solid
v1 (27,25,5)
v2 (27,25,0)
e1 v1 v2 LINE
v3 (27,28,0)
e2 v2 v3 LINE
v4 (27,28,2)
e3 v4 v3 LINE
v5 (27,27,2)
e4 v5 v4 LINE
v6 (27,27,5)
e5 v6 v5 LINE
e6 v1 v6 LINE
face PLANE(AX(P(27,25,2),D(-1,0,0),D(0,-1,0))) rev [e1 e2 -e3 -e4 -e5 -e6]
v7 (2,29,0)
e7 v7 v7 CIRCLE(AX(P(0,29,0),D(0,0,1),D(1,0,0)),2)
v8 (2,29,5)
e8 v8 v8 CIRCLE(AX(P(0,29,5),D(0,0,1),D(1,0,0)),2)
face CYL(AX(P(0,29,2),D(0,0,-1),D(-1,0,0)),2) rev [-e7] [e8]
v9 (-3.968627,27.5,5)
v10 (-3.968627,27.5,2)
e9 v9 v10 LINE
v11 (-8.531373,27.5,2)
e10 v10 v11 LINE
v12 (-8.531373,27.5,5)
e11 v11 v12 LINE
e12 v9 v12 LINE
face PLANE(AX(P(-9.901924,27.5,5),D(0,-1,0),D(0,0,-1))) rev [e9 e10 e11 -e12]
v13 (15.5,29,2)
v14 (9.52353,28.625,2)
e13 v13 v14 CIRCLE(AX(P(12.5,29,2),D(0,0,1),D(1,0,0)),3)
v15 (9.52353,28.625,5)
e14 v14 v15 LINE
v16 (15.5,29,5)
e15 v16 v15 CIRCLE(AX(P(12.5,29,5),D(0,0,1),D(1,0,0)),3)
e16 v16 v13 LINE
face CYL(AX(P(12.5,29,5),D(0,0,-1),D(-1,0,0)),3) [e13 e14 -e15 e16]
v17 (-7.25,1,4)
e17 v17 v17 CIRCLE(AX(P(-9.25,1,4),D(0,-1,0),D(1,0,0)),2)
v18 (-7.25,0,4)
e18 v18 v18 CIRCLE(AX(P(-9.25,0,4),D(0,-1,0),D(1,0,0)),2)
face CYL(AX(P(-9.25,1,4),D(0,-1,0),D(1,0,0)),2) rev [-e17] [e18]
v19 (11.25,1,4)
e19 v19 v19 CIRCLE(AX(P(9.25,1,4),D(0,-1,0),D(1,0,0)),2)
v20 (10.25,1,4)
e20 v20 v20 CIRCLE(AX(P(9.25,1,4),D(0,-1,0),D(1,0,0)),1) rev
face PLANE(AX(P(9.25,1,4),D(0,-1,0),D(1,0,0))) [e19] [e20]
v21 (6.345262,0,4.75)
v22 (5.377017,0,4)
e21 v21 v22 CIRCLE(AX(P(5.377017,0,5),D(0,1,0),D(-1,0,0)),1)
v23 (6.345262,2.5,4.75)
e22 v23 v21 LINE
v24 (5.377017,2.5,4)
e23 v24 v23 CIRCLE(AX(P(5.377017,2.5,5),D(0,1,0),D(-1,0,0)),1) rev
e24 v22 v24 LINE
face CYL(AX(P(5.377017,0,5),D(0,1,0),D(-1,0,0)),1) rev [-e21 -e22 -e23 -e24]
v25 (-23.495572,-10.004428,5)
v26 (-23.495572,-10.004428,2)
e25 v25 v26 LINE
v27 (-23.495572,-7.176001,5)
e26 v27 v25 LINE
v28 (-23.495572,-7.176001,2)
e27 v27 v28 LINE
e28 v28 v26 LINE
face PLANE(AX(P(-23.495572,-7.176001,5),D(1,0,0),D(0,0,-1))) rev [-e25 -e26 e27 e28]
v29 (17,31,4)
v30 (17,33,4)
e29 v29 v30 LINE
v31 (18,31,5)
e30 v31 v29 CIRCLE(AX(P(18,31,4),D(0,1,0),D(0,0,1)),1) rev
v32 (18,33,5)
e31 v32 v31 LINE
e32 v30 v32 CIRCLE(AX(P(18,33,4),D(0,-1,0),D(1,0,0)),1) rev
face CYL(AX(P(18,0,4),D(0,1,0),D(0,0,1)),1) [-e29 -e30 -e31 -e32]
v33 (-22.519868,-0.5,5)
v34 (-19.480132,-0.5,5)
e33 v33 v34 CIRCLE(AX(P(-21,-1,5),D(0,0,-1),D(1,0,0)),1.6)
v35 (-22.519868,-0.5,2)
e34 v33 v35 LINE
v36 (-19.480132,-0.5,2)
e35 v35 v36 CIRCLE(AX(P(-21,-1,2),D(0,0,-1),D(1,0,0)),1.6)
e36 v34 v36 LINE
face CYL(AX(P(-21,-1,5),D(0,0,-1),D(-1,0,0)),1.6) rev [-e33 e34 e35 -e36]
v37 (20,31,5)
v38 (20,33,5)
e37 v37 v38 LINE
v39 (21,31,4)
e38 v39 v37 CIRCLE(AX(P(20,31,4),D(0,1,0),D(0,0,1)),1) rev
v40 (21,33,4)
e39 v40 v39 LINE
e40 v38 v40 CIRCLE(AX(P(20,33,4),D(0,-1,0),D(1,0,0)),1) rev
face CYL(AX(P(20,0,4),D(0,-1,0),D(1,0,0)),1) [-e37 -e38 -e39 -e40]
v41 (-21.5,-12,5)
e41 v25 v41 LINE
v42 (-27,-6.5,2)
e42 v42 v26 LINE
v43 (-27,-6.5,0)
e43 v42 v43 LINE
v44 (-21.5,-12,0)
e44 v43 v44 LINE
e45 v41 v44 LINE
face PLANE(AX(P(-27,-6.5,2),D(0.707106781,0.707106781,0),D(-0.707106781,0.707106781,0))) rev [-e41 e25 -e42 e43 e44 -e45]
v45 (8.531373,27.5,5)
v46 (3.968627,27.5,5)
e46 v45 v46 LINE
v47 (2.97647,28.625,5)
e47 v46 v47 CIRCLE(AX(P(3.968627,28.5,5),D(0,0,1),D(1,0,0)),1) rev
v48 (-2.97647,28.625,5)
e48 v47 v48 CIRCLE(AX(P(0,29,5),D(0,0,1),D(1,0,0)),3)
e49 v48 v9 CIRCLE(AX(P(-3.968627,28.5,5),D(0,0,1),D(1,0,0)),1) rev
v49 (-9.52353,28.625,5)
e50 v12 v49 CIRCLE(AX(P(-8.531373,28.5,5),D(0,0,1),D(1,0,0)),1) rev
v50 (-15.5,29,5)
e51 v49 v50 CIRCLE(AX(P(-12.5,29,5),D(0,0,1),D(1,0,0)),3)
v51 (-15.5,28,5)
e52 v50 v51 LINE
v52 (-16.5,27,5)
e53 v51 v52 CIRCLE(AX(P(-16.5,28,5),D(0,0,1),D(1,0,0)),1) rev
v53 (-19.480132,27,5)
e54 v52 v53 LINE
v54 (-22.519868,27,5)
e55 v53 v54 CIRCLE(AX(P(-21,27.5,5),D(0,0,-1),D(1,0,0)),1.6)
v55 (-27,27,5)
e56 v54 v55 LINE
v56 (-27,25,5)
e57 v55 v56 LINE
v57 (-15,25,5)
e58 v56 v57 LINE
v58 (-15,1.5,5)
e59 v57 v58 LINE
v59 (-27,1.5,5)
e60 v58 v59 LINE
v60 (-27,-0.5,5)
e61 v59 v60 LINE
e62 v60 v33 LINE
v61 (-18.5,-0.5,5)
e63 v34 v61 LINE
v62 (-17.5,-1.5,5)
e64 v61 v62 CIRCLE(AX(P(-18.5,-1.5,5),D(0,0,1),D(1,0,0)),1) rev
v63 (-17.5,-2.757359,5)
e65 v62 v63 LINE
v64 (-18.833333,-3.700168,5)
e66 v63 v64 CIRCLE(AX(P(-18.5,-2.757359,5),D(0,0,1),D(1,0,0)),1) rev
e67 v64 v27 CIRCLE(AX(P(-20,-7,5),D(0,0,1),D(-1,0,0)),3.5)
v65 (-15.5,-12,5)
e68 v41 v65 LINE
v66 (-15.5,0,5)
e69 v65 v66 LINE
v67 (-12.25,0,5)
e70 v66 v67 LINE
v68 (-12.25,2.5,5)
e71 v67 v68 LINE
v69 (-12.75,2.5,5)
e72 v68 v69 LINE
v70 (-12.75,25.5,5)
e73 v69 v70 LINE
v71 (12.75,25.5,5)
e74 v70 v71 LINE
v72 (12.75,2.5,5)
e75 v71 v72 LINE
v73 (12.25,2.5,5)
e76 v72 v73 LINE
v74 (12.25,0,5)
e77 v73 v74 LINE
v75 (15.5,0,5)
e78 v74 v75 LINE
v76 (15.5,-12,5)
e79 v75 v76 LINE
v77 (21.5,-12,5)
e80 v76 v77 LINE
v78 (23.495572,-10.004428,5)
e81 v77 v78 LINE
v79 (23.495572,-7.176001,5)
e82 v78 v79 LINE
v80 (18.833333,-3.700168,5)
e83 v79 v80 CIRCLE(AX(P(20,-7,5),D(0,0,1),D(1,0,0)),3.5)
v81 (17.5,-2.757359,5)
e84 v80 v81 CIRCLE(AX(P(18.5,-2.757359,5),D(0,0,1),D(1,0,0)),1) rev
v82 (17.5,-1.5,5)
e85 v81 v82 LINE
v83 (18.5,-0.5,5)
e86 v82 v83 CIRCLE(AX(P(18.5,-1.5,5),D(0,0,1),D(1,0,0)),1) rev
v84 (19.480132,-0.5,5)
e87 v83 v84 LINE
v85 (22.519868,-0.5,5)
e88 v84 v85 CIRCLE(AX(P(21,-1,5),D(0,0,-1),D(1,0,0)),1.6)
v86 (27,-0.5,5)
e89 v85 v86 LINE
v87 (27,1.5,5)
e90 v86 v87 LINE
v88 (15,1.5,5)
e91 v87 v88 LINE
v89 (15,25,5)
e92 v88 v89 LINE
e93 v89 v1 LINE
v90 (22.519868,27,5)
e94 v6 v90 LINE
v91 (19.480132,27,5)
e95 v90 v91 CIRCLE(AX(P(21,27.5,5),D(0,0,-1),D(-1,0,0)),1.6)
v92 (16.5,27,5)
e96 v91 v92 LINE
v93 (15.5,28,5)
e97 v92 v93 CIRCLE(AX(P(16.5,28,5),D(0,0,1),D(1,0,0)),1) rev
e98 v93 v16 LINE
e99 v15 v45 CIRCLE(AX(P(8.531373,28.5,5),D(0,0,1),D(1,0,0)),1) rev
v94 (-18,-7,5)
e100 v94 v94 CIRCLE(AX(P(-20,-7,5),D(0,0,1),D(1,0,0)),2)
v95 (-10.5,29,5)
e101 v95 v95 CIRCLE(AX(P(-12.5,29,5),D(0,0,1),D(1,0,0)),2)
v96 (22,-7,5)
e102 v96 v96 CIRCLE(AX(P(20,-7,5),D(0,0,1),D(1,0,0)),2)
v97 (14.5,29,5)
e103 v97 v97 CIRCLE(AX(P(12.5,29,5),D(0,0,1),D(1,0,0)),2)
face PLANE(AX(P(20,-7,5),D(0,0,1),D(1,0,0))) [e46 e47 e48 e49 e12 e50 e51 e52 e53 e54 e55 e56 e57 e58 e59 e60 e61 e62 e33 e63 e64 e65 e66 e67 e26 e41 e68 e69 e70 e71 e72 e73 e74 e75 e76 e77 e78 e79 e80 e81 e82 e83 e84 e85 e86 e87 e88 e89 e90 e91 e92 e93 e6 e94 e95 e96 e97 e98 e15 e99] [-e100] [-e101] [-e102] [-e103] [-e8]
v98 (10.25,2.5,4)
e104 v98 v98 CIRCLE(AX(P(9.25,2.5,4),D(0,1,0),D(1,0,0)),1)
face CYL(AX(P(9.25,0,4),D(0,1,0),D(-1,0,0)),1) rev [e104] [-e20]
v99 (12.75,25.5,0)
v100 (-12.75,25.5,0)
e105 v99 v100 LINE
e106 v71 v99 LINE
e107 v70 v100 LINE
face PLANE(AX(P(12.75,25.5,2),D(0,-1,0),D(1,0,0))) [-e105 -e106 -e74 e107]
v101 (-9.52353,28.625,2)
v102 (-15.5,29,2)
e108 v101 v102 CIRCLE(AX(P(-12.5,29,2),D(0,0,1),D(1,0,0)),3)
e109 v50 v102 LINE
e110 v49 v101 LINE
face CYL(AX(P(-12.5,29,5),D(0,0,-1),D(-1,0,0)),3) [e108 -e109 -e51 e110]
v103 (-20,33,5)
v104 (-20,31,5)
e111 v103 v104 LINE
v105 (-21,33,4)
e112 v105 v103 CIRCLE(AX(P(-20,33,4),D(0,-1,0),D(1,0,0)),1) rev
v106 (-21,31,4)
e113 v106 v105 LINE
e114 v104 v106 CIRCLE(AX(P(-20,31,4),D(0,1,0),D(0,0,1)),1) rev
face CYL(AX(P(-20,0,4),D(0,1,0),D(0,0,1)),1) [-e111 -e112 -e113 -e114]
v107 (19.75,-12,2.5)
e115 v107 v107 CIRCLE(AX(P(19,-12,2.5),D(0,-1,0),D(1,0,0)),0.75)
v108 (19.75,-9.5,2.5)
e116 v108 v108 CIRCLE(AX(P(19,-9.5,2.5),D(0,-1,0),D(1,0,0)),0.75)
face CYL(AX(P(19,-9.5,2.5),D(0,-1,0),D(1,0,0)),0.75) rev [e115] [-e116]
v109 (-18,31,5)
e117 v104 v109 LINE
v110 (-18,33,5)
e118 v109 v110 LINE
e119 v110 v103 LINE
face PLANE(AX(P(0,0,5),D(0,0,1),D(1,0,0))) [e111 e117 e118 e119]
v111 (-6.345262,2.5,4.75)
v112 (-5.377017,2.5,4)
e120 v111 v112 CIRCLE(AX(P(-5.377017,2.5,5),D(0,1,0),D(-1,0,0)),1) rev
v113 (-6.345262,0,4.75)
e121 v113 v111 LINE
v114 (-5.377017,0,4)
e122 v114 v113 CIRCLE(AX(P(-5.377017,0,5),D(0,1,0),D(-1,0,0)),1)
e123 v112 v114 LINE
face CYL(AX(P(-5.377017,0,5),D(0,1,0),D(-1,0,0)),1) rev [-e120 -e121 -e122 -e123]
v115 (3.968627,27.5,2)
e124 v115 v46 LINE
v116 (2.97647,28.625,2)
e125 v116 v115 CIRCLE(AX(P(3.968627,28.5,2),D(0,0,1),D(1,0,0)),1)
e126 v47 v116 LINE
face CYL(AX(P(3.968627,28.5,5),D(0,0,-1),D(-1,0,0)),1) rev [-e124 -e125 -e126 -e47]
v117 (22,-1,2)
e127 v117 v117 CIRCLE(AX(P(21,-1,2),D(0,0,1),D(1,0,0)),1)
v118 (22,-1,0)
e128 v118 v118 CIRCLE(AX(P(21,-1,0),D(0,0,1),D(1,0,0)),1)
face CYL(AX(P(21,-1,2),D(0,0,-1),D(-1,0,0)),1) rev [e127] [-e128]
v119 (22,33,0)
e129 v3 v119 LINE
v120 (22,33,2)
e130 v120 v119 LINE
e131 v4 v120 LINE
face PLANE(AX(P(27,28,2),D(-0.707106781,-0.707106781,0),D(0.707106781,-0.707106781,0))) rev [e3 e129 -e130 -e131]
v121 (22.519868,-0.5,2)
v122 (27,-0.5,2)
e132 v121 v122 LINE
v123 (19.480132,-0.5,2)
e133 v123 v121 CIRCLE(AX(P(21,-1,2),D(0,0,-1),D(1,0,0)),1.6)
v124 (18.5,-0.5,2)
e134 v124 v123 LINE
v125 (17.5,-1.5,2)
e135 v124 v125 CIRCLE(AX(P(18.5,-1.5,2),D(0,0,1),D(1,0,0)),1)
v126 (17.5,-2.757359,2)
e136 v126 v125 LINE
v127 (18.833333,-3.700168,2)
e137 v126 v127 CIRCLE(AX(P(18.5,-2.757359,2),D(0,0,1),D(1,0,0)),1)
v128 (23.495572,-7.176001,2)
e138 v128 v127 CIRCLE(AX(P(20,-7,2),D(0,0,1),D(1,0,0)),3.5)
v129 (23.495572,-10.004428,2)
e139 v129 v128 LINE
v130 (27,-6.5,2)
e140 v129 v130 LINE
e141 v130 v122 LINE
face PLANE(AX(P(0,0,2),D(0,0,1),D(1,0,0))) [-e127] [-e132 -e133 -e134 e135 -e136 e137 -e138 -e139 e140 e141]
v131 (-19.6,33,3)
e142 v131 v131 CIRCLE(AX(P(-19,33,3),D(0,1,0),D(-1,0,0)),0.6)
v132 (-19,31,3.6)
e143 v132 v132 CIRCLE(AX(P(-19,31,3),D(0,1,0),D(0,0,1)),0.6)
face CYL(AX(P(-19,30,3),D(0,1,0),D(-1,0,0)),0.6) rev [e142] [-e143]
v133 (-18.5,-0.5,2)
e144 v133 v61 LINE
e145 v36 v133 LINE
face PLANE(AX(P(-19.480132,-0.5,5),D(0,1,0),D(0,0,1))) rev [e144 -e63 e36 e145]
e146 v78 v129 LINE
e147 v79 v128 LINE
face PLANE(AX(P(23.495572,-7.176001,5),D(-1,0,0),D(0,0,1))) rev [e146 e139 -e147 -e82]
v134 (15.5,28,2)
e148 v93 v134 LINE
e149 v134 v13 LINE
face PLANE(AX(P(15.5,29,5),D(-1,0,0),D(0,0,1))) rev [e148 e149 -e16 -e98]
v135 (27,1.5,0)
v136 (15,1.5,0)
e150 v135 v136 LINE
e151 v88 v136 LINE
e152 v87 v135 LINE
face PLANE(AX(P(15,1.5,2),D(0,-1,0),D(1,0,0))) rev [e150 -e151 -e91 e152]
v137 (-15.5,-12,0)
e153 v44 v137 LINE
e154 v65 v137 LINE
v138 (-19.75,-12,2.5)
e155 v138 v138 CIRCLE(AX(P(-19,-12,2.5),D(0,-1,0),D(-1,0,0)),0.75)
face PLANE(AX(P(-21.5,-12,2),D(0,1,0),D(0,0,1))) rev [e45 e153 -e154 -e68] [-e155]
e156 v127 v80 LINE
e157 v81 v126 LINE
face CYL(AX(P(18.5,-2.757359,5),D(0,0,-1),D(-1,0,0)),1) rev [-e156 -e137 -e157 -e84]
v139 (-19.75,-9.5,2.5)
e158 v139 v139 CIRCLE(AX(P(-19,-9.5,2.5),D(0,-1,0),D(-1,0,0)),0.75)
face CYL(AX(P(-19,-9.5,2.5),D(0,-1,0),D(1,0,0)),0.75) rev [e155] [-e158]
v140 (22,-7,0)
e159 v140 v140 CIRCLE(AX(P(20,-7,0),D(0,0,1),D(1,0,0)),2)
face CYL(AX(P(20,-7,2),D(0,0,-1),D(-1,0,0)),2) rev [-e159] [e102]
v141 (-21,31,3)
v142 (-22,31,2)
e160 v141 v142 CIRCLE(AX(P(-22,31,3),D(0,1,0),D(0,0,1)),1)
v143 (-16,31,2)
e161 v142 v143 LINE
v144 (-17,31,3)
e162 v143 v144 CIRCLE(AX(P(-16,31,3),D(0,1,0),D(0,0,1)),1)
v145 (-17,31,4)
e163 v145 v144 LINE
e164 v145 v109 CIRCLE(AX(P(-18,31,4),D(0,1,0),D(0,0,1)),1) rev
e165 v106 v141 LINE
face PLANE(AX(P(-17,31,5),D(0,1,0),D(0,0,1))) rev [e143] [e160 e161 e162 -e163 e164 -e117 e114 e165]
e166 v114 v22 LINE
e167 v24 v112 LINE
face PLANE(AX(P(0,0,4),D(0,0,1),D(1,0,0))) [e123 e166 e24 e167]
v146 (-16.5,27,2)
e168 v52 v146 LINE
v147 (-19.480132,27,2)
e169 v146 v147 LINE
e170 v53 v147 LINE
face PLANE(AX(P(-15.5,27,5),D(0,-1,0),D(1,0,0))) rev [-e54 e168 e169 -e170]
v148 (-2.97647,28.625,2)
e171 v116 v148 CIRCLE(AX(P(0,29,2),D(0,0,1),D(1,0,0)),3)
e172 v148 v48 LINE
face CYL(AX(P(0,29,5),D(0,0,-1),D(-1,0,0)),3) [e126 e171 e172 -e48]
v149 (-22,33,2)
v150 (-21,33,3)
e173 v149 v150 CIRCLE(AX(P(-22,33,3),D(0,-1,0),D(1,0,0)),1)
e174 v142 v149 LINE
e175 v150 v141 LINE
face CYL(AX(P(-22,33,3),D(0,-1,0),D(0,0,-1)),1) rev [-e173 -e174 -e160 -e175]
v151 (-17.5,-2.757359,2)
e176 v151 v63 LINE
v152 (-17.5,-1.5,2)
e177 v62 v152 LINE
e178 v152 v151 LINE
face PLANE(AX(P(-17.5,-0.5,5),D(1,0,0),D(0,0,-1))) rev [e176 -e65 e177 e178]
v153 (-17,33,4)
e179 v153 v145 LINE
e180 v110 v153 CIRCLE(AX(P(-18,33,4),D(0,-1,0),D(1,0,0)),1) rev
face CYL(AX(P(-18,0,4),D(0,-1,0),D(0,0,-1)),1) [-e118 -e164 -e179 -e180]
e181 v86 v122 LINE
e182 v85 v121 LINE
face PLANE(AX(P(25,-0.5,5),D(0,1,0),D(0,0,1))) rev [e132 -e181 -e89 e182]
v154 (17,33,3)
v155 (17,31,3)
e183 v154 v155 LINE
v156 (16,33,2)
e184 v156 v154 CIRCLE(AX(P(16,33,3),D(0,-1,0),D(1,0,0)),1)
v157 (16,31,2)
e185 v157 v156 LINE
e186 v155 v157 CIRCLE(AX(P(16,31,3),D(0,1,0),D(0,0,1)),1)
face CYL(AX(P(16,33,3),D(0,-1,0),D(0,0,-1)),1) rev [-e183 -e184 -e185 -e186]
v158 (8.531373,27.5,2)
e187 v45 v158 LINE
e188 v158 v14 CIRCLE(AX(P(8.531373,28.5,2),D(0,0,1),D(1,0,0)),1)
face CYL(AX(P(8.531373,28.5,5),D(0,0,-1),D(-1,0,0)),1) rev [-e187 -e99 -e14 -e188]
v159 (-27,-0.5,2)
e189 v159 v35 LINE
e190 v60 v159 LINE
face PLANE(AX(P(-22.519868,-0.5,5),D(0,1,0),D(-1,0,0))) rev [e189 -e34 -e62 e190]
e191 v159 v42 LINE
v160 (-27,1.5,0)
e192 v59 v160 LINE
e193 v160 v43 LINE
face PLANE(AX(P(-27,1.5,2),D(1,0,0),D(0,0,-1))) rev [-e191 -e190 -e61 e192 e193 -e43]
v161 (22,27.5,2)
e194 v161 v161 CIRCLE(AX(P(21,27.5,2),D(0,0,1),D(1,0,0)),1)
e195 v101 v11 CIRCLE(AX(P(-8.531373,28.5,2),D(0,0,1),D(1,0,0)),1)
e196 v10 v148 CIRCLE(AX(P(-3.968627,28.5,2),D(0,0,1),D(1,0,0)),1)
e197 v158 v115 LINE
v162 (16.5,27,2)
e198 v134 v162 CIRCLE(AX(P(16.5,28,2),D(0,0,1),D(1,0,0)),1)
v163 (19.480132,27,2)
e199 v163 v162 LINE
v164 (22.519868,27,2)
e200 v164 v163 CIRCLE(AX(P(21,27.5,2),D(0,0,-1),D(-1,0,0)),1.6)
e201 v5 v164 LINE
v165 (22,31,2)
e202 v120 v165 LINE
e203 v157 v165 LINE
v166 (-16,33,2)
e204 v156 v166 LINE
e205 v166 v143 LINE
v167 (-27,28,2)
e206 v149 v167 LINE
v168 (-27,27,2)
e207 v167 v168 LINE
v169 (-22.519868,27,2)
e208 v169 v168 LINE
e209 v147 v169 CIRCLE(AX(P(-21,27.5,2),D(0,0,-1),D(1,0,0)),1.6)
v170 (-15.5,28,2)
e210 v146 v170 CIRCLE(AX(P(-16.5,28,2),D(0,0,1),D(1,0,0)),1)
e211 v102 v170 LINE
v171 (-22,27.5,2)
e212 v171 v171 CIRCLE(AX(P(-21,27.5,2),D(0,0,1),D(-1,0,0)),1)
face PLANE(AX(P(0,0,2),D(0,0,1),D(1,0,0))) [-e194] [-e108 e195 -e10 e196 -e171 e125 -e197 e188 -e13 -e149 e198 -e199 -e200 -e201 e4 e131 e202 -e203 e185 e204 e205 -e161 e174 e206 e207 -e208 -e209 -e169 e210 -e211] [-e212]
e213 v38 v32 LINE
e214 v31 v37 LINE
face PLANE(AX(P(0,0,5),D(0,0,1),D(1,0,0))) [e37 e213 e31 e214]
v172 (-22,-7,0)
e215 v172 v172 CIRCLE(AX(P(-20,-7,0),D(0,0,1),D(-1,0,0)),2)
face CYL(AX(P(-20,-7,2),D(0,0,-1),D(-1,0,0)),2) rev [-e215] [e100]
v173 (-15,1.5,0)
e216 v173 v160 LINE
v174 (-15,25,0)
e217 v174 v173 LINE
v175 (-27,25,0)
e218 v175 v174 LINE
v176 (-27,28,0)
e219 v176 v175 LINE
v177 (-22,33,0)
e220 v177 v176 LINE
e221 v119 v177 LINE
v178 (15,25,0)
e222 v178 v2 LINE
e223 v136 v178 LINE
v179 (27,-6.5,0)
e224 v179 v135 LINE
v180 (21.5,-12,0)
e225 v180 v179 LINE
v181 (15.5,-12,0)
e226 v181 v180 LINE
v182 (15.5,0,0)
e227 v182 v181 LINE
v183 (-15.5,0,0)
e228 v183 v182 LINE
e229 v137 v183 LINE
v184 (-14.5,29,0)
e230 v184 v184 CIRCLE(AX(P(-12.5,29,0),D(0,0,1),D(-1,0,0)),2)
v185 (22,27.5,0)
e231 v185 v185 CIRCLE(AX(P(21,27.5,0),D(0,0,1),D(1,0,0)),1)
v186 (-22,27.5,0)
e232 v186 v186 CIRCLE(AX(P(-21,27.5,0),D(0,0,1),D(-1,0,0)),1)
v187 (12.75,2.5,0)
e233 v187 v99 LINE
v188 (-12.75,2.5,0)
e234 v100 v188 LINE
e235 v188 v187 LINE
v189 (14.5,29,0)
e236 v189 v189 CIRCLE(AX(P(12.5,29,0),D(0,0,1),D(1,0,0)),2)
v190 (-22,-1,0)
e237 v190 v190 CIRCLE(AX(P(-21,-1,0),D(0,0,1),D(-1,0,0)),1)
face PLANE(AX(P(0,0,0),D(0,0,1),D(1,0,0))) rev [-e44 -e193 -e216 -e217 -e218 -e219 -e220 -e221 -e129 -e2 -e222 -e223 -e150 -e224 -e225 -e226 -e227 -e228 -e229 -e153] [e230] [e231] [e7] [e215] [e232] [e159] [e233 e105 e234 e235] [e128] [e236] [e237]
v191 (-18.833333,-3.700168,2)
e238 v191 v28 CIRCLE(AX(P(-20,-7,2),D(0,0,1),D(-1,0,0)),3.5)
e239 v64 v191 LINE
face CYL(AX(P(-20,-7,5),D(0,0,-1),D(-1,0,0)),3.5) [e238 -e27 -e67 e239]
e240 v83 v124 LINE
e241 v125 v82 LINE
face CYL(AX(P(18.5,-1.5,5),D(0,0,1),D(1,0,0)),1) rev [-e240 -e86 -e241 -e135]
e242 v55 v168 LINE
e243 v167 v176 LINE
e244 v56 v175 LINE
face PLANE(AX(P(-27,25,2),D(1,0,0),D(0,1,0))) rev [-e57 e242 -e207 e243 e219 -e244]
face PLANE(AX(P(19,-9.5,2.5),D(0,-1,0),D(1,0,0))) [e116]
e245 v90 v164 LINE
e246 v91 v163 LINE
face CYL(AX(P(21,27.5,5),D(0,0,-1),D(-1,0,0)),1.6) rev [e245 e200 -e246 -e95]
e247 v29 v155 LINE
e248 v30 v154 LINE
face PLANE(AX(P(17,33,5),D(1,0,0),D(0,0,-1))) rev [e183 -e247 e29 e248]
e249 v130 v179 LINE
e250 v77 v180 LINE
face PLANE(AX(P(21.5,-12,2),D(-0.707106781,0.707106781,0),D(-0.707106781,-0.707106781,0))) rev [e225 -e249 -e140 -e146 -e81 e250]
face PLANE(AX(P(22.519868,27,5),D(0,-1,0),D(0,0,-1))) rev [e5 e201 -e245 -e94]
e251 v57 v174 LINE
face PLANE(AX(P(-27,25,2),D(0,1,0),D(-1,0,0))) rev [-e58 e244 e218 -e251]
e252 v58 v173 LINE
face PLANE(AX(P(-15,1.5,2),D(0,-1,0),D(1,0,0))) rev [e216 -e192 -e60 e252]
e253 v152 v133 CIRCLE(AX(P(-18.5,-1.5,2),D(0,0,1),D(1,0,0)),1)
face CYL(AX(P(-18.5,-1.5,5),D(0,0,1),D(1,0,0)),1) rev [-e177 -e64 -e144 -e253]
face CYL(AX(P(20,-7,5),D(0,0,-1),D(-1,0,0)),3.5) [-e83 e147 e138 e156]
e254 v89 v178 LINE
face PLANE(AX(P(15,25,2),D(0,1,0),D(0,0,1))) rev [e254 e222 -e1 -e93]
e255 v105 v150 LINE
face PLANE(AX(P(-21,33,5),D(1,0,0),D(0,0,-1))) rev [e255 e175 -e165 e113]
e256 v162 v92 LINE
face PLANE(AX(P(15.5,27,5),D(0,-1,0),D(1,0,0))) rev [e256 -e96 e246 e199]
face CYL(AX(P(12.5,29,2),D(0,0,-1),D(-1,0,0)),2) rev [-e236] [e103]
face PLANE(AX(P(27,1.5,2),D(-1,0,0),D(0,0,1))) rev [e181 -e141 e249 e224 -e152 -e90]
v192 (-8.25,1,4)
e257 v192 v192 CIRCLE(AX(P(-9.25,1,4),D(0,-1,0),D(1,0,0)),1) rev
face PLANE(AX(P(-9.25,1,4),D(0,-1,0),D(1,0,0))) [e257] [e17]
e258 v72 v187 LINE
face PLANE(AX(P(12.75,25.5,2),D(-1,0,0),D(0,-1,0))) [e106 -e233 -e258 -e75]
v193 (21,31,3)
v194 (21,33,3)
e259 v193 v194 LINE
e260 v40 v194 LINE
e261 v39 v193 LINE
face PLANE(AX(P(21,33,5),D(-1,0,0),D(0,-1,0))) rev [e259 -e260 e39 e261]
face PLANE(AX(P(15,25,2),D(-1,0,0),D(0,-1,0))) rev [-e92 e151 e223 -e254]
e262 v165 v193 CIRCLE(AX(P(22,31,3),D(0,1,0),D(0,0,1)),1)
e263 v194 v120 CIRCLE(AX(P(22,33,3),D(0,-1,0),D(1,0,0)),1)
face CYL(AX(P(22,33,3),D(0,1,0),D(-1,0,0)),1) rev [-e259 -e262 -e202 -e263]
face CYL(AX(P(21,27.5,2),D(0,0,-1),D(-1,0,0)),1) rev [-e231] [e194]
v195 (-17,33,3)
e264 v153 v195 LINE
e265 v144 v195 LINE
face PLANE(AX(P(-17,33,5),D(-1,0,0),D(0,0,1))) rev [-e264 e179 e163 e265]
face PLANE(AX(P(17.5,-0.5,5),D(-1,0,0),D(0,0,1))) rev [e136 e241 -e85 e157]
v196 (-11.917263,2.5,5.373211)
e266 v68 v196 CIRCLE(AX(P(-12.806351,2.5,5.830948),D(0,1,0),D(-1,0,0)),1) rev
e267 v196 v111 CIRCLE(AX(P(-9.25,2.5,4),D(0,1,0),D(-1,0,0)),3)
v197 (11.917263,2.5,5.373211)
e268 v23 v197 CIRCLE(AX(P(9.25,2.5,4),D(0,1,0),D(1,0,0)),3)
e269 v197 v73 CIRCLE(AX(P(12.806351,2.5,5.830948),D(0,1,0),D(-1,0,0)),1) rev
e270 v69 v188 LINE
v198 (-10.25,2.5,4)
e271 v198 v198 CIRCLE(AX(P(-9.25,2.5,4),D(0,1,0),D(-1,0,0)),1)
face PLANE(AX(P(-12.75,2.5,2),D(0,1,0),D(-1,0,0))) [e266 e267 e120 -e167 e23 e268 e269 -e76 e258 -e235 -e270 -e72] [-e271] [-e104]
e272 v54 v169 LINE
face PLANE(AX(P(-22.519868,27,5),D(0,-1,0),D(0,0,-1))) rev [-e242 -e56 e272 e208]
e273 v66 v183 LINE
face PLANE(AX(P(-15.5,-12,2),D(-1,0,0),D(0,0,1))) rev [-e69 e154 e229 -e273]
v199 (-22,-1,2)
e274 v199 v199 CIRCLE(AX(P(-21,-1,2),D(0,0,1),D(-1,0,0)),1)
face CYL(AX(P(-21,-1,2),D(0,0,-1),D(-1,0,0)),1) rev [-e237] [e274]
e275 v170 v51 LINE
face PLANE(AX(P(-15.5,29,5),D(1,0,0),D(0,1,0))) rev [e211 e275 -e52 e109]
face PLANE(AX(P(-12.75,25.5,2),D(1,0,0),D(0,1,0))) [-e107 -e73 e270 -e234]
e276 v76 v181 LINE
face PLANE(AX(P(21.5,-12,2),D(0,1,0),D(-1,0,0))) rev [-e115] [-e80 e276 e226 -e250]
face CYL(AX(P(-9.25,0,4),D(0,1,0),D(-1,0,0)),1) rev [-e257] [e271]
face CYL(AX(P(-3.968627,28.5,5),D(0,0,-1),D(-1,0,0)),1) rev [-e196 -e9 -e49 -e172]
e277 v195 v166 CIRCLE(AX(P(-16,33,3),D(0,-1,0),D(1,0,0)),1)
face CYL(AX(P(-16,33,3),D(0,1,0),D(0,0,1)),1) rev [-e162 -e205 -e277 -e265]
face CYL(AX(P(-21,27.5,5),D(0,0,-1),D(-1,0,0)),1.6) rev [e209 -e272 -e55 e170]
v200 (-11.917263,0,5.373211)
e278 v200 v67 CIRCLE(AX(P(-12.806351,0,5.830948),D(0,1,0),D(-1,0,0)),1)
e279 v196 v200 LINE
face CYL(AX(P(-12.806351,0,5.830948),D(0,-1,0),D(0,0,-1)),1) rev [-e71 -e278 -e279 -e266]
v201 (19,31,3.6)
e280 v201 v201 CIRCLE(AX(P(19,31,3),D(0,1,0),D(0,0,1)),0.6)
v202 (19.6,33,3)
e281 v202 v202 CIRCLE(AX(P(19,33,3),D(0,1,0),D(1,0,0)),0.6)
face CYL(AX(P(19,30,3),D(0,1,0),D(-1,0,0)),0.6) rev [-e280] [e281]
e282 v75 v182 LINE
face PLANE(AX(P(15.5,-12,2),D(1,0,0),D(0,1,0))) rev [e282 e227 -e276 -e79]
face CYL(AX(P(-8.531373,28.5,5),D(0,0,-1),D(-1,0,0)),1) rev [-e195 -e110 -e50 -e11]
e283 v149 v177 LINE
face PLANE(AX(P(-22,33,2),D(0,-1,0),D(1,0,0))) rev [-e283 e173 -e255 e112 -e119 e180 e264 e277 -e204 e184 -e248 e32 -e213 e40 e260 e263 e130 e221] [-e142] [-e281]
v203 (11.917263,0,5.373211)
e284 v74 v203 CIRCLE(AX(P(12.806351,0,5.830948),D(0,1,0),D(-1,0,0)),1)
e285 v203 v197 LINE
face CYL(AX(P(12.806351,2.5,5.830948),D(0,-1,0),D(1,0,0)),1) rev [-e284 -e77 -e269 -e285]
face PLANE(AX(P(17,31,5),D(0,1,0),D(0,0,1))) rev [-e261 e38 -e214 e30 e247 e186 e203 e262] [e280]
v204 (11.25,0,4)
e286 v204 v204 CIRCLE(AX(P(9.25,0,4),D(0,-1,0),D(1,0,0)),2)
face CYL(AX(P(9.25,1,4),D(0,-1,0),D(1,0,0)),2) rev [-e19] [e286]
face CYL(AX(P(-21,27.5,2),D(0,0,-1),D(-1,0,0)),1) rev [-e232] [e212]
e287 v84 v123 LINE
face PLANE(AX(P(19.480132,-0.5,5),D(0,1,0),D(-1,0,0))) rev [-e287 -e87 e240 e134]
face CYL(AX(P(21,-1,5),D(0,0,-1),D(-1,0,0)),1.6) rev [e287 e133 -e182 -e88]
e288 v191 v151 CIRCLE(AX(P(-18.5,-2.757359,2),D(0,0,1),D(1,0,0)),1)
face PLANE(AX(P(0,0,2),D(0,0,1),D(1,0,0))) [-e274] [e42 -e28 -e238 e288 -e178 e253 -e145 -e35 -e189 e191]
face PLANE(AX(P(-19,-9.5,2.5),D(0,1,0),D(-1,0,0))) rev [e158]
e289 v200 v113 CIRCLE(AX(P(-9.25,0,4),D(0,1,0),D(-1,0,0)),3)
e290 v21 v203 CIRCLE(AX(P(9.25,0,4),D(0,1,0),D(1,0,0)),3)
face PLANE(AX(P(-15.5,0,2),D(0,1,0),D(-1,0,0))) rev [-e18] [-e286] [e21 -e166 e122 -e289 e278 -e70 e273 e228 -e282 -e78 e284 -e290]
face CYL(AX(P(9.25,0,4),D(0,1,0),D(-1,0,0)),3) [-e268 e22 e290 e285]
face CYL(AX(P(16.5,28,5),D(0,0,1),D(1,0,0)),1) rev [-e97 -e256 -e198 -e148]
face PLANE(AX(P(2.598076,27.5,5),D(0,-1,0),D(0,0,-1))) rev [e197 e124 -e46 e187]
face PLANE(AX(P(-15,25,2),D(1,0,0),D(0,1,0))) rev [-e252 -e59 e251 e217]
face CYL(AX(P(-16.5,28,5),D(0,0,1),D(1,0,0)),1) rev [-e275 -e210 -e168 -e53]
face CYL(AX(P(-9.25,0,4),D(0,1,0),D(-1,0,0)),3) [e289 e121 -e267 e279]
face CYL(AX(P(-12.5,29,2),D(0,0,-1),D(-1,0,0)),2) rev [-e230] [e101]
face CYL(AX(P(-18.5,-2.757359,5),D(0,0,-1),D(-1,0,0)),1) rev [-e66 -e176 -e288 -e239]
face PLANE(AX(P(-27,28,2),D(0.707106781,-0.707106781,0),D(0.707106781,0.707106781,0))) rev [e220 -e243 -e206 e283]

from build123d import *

# Parameters (mm, degrees)
SKETCH_1_R          = 2
SKETCH_1_R_2        = 1
SKETCH_1_W          = 25.5
SKETCH_1_H          = 23
EXTRUDE_1_DEPTH     = 2
SKETCH_3_R          = 1
EXTRUDE_2_DEPTH     = 2.5
SKETCH_4_R          = 2
SKETCH_4_W          = 4
SKETCH_4_H          = 2
EXTRUDE_3_DEPTH     = 3
FILLET_1_R          = 1
FILLET_2_R          = 1
SKETCH_5_W          = 12.5
SKETCH_5_H          = 2.5
EXTRUDE_4_DEPTH     = 2
FILLET_3_R          = 1
SKETCH_6_R          = 2
CUT_EXTRUDE_1_DEPTH = 1
SKETCH_7_R          = 0.75
CUT_EXTRUDE_2_DEPTH = 2.5
SKETCH_8_R          = 0.6
CUT_EXTRUDE_3_DEPTH = 3


with BuildPart() as part:
    # 草图1 → 凸台-拉伸1 (new body)
    with BuildSketch(Plane.XY):
        Polygon((-27, 25), (-15, 25), (-15, 1.5), (-27, 1.5), (-27, -6.5), (-21.5, -12), (-15.5, -12), (-15.5, 0), (15.5, 0), (15.5, -12), (21.5, -12), (27, -6.5), (27, 1.5), (15, 1.5), (15, 25), (27, 25), (27, 28), (22, 33), (-22, 33), (-27, 28), align=None)
        with Locations((20, -7)):
            Circle(SKETCH_1_R, mode=Mode.SUBTRACT)
        with Locations((12.5, 29)):
            Circle(SKETCH_1_R, mode=Mode.SUBTRACT)
        with Locations((0, 29)):
            Circle(SKETCH_1_R, mode=Mode.SUBTRACT)
        with Locations(Location((-20, -7, 0), (0, 0, 180))):
            Circle(SKETCH_1_R, mode=Mode.SUBTRACT)
        with Locations(Location((-12.5, 29, 0), (0, 0, 180))):
            Circle(SKETCH_1_R, mode=Mode.SUBTRACT)
        with Locations((21, 27.5)):
            Circle(SKETCH_1_R_2, mode=Mode.SUBTRACT)
        with Locations((21, -1)):
            Circle(SKETCH_1_R_2, mode=Mode.SUBTRACT)
        with Locations(Location((-21, 27.5, 0), (0, 0, 180))):
            Circle(SKETCH_1_R_2, mode=Mode.SUBTRACT)
        with Locations(Location((-21, -1, 0), (0, 0, 180))):
            Circle(SKETCH_1_R_2, mode=Mode.SUBTRACT)
        with Locations((0, 14)):
            Rectangle(SKETCH_1_W, SKETCH_1_H, mode=Mode.SUBTRACT)
    extrude(amount=EXTRUDE_1_DEPTH)

    # 草图3 → 凸台-拉伸2 (add)
    # profile 1 of 2: a face of its own
    with BuildSketch(Plane(origin=(0, 2.5, 0), x_dir=(1, 0, 0), z_dir=(0, 1, 0))):
        with BuildLine():
            Line((-6.25, -2), (-6.25, -4))
            ThreePointArc((-6.25, -4), (-9.25, -7), (-12.25, -4))
            Line((-12.25, -4), (-12.25, -2))
            Line((-12.25, -2), (-6.25, -2))
        make_face()
        with Locations(Location((-9.25, -4, 0), (0, 0, 180))):
            Circle(SKETCH_3_R, mode=Mode.SUBTRACT)
    # profile 2 of 2: a face of its own
    with BuildSketch(Plane(origin=(0, 2.5, 0), x_dir=(1, 0, 0), z_dir=(0, 1, 0))):
        with BuildLine():
            Line((12.25, -2), (6.25, -2))
            Line((6.25, -2), (6.25, -4))
            ThreePointArc((6.25, -4), (9.25, -7), (12.25, -4))
            Line((12.25, -4), (12.25, -2))
        make_face()
        with Locations((9.25, -4)):
            Circle(SKETCH_3_R, mode=Mode.SUBTRACT)
    extrude(amount=-EXTRUDE_2_DEPTH)

    # 草图4 → 凸台-拉伸3 (add)
    # profile 1 of 3: a face of its own
    with BuildSketch(Plane.XY.offset(2)):
        with BuildLine():
            Line((-15.5, 29), (-15.5, 27))
            Line((-15.5, 27), (-19.480131585, 27))
            ThreePointArc((-19.480131585, 27), (-21, 25.9), (-22.519868415, 27))
            Line((-22.519868415, 27), (-27, 27))
            Line((-27, 27), (-27, 25))
            Line((-27, 25), (-16.5, 25))
            Line((-16.5, 25), (-15, 25))
            Line((-15, 25), (-15, 1.5))
            Line((-15, 1.5), (-27, 1.5))
            Line((-27, 1.5), (-27, -0.5))
            Line((-27, -0.5), (-25, -0.5))
            Line((-25, -0.5), (-22.519868415, -0.5))
            ThreePointArc((-22.519868415, -0.5), (-21, 0.6), (-19.480131585, -0.5))
            Line((-19.480131585, -0.5), (-17.5, -0.5))
            Line((-17.5, -0.5), (-17.5, -4.550510257))
            ThreePointArc((-17.5, -4.550510257), (-21.403955533, -3.793926254), (-23.495572013, -7.176000862))
            Line((-23.495572013, -7.176000862), (-23.495572013, -10.004427987))
            Line((-23.495572013, -10.004427987), (-21.5, -12))
            Line((-21.5, -12), (-15.5, -12))
            Line((-15.5, -12), (-15.5, 0))
            Line((-15.5, 0), (-12.25, 0))
            Line((-12.25, 0), (-12.25, 2.5))
            Line((-12.25, 2.5), (-12.75, 2.5))
            Line((-12.75, 2.5), (-12.75, 25.5))
            Line((-12.75, 25.5), (12.75, 25.5))
            Line((12.75, 25.5), (12.75, 2.5))
            Line((12.75, 2.5), (12.25, 2.5))
            Line((12.25, 2.5), (12.25, 0))
            Line((12.25, 0), (15.5, 0))
            Line((15.5, 0), (15.5, -12))
            Line((15.5, -12), (21.5, -12))
            Line((21.5, -12), (23.495572013, -10.004427987))
            Line((23.495572013, -10.004427987), (23.495572013, -7.176000862))
            ThreePointArc((23.495572013, -7.176000862), (21.403955533, -3.793926254), (17.5, -4.550510257))
            Line((17.5, -4.550510257), (17.5, -0.5))
            Line((17.5, -0.5), (19.480131585, -0.5))
            ThreePointArc((19.480131585, -0.5), (21, 0.6), (22.519868415, -0.5))
            Line((22.519868415, -0.5), (25, -0.5))
            Line((25, -0.5), (27, -0.5))
            Line((27, -0.5), (27, 1.5))
            Line((27, 1.5), (15, 1.5))
            Line((15, 1.5), (15, 25))
            Line((15, 25), (16.5, 25))
            Line((16.5, 25), (27, 25))
            Line((27, 25), (27, 27))
            Line((27, 27), (22.519868415, 27))
            ThreePointArc((22.519868415, 27), (21, 25.9), (19.480131585, 27))
            Line((19.480131585, 27), (15.5, 27))
            Line((15.5, 27), (15.5, 29))
            ThreePointArc((15.5, 29), (11.723542865, 31.897777479), (9.901923789, 27.5))
            Line((9.901923789, 27.5), (2.598076211, 27.5))
            ThreePointArc((2.598076211, 27.5), (0, 32), (-2.598076211, 27.5))
            Line((-2.598076211, 27.5), (-9.901923789, 27.5))
            ThreePointArc((-9.901923789, 27.5), (-11.723542865, 31.897777479), (-15.5, 29))
        make_face()
        with Locations((20, -7)):
            Circle(SKETCH_4_R, mode=Mode.SUBTRACT)
        with Locations((12.5, 29)):
            Circle(SKETCH_4_R, mode=Mode.SUBTRACT)
        with Locations((0, 29)):
            Circle(SKETCH_4_R, mode=Mode.SUBTRACT)
        with Locations(Location((-12.5, 29, 0), (0, 0, 180))):
            Circle(SKETCH_4_R, mode=Mode.SUBTRACT)
        with Locations(Location((-20, -7, 0), (0, 0, 180))):
            Circle(SKETCH_4_R, mode=Mode.SUBTRACT)
    # profile 2 of 3: a face of its own
    with BuildSketch(Plane.XY.offset(2)):
        with Locations((-19, 32)):
            Rectangle(SKETCH_4_W, SKETCH_4_H)
    # profile 3 of 3: a face of its own
    with BuildSketch(Plane.XY.offset(2)):
        with Locations((19, 32)):
            Rectangle(SKETCH_4_W, SKETCH_4_H)
    extrude(amount=EXTRUDE_3_DEPTH)

    # 圆角1
    # the kernel refuses this fillet: 1 mm, written as the material it adds along each edge
    with BuildSketch(Plane(origin=(17.5, -4.550510257, 2), x_dir=(0, 1, 0), z_dir=(0, 0, 1))) as fillet_1_piece_1:
        with BuildLine():
            CenterArc((1.793150944, -1), FILLET_1_R, 90, 109.471220634)
            ThreePointArc((0.850341903, -1.333333333), (0.5014624, -0.618011305), (0, 0))
            Line((0, 0), (1.793150944, 0))
        make_face()
    extrude(amount=3)
    with BuildSketch(Plane(origin=(17.5, -0.5, 2), x_dir=(1, 0, 0), z_dir=(0, 0, 1)), Plane(origin=(15.5, 27, 2), x_dir=(0, 1, 0), z_dir=(0, 0, 1)), Plane(origin=(-15.5, 27, 2), x_dir=(-1, 0, 0), z_dir=(0, 0, 1)), Plane(origin=(-17.5, -0.5, 2), x_dir=(0, -1, 0), z_dir=(0, 0, 1))) as fillet_1_piece_2:
        with BuildLine():
            CenterArc((FILLET_1_R, -FILLET_1_R), FILLET_1_R, 90, 90)
            Line((0, -FILLET_1_R), (0, 0))
            Line((0, 0), (FILLET_1_R, 0))
        make_face()
    extrude(amount=3)
    with BuildSketch(Plane(origin=(9.901923789, 27.5, 2), x_dir=(-1, 0, 0), z_dir=(0, 0, 1)), Plane(origin=(-2.598076211, 27.5, 2), x_dir=(-1, 0, 0), z_dir=(0, 0, 1))) as fillet_1_piece_3:
        with BuildLine():
            CenterArc((1.370550755, -1), FILLET_1_R, 90, 97.180755781)
            ThreePointArc((0.378394014, -1.125), (0.245389674, -0.543599583), (0, 0))
            Line((0, 0), (1.370550755, 0))
        make_face()
    extrude(amount=3)
    with BuildSketch(Plane(origin=(2.598076211, 27.5, 2), x_dir=(0.31880013895525616, 0.9478219618694798, 0), z_dir=(0, 0, 1)), Plane(origin=(-9.901923789, 27.5, 2), x_dir=(0.3188001389552541, 0.9478219618694803, 0), z_dir=(0, 0, 1))) as fillet_1_piece_4:
        with BuildLine():
            CenterArc((1.384753733, -0.980237967), FILLET_1_R, 101.409622109, 97.180755781)
            Line((0.436931771, -1.299038106), (0, 0))
            ThreePointArc((0, 0), (0.593465886, -0.0592861), (1.186931771, 0))
        make_face()
    extrude(amount=3)
    with BuildSketch(Plane(origin=(-17.5, -4.550510257, 2), x_dir=(-0.8431291837491304, 0.5377110557823086, 0), z_dir=(0, 0, 1))) as fillet_1_piece_5:
        with BuildLine():
            CenterArc((1.807326271, -0.974146836), FILLET_1_R, 103.056735384, 109.471220635)
            Line((0.964197087, -1.511857892), (0, 0))
            ThreePointArc((0, 0), (0.790705244, -0.090486073), (1.581410487, 0))
        make_face()
    extrude(amount=3)
    with BuildSketch(Plane(origin=(-21, 33, 2), x_dir=(-1, 0, 0), z_dir=(0, -1, 0)), Plane(origin=(-17, 31, 2), x_dir=(1, 0, 0), z_dir=(0, 1, 0))) as fillet_1_piece_6:
        with BuildLine():
            CenterArc((FILLET_1_R, -FILLET_1_R), FILLET_1_R, 90, 90)
            Line((0, -FILLET_1_R), (0, 0))
            Line((0, 0), (FILLET_1_R, 0))
        make_face()
    extrude(amount=2)
    with BuildSketch(Plane(origin=(17, 31, 2), x_dir=(-1, 0, 0), z_dir=(0, 1, 0)), Plane(origin=(21, 33, 2), x_dir=(1, 0, 0), z_dir=(0, -1, 0))) as fillet_1_piece_7:
        with BuildLine():
            CenterArc((FILLET_1_R, FILLET_1_R), FILLET_1_R, 180, 90)
            Line((0, FILLET_1_R), (0, 0))
            Line((0, 0), (FILLET_1_R, 0))
        make_face()
    extrude(amount=2)
    # the kernel refuses this fillet: 1 mm, written as the material it takes off along each edge
    with BuildSketch(Plane(origin=(-21, 35.5, 5), x_dir=(0, 0, -1), z_dir=(0, -1, 0)), Plane(origin=(21, 35.5, 5), x_dir=(-1, 0, 0), z_dir=(0, -1, 0))) as fillet_1_2_piece_1:
        with BuildLine():
            CenterArc((FILLET_1_R, FILLET_1_R), FILLET_1_R, 180, 90)
            Line((0, FILLET_1_R), (0, 0))
            Line((0, 0), (FILLET_1_R, 0))
        make_face()
    extrude(amount=7, mode=Mode.SUBTRACT)
    with BuildSketch(Plane(origin=(-17, 28.5, 5), x_dir=(-1, 0, 0), z_dir=(0, 1, 0)), Plane(origin=(17, 28.5, 5), x_dir=(0, 0, -1), z_dir=(0, 1, 0))) as fillet_1_2_piece_2:
        with BuildLine():
            CenterArc((FILLET_1_R, -FILLET_1_R), FILLET_1_R, 90, 90)
            Line((0, -FILLET_1_R), (0, 0))
            Line((0, 0), (FILLET_1_R, 0))
        make_face()
    extrude(amount=7, mode=Mode.SUBTRACT)

    # 圆角2
    # the kernel refuses this fillet: 1 mm, written as the material it adds along each edge
    with BuildSketch(Plane(origin=(-12.25, 2.5, 4), x_dir=(0, 0, 1), z_dir=(0, -1, 0))) as fillet_2_piece_1:
        with BuildLine():
            CenterArc((1.830947502, 0.556350833), FILLET_2_R, 213.80380727, 28.955024372)
            ThreePointArc((1.373210626, -0.332736875), (0.706473859, -0.084370619), (0, 0))
            Line((0, 0), (1, 0))
        make_face()
    extrude(amount=2.5)
    with BuildSketch(Plane(origin=(12.25, 2.5, 4), x_dir=(0, 0, 1), z_dir=(0, -1, 0))) as fillet_2_piece_2:
        with BuildLine():
            CenterArc((1.830947502, -0.556350833), FILLET_2_R, 117.241168358, 28.955024372)
            ThreePointArc((1.373210626, 0.332736875), (0.706473859, 0.084370619), (0, 0))
            Line((0, 0), (1, 0))
        make_face()
    extrude(amount=2.5)

    # 草图5 → 凸台-拉伸4 (add)
    with BuildSketch(Plane.XY.offset(2)):
        with Locations((0, 1.25)):
            Rectangle(SKETCH_5_W, SKETCH_5_H)
    extrude(amount=EXTRUDE_4_DEPTH)

    # 圆角3
    fillet_3_edges = [part.edges().sort_by_distance(p)[0] for p in [
        (-6.25, 1.25, 4),
        (6.25, 1.25, 4),
    ]]
    fillet(fillet_3_edges, radius=FILLET_3_R)

    # 草图6 → 切除-拉伸1 (cut)
    with BuildSketch(Plane.XZ):
        with Locations((-9.25, 4)):
            Circle(SKETCH_6_R)
        with Locations((9.25, 4)):
            Circle(SKETCH_6_R)
    extrude(amount=-CUT_EXTRUDE_1_DEPTH, mode=Mode.SUBTRACT)

    # 草图7 → 切除-拉伸2 (cut)
    with BuildSketch(Plane.XZ.offset(12)):
        with Locations((19, 2.5)):
            Circle(SKETCH_7_R)
        with Locations(Location((-19, 2.5, 0), (0, 0, 180))):
            Circle(SKETCH_7_R)
    extrude(amount=-CUT_EXTRUDE_2_DEPTH, mode=Mode.SUBTRACT)

    # 草图8 → 切除-拉伸3 (cut)
    with BuildSketch(Plane(origin=(0, 33, 0), x_dir=(1, 0, 0), z_dir=(0, 1, 0))):
        with Locations(Location((-19, -3, 0), (0, 0, 180))):
            Circle(SKETCH_8_R)
        with Locations(Location((19, -3, 0), (0, 0, 270))):
            Circle(SKETCH_8_R)
    extrude(amount=-CUT_EXTRUDE_3_DEPTH, mode=Mode.SUBTRACT)


solid = part.part
